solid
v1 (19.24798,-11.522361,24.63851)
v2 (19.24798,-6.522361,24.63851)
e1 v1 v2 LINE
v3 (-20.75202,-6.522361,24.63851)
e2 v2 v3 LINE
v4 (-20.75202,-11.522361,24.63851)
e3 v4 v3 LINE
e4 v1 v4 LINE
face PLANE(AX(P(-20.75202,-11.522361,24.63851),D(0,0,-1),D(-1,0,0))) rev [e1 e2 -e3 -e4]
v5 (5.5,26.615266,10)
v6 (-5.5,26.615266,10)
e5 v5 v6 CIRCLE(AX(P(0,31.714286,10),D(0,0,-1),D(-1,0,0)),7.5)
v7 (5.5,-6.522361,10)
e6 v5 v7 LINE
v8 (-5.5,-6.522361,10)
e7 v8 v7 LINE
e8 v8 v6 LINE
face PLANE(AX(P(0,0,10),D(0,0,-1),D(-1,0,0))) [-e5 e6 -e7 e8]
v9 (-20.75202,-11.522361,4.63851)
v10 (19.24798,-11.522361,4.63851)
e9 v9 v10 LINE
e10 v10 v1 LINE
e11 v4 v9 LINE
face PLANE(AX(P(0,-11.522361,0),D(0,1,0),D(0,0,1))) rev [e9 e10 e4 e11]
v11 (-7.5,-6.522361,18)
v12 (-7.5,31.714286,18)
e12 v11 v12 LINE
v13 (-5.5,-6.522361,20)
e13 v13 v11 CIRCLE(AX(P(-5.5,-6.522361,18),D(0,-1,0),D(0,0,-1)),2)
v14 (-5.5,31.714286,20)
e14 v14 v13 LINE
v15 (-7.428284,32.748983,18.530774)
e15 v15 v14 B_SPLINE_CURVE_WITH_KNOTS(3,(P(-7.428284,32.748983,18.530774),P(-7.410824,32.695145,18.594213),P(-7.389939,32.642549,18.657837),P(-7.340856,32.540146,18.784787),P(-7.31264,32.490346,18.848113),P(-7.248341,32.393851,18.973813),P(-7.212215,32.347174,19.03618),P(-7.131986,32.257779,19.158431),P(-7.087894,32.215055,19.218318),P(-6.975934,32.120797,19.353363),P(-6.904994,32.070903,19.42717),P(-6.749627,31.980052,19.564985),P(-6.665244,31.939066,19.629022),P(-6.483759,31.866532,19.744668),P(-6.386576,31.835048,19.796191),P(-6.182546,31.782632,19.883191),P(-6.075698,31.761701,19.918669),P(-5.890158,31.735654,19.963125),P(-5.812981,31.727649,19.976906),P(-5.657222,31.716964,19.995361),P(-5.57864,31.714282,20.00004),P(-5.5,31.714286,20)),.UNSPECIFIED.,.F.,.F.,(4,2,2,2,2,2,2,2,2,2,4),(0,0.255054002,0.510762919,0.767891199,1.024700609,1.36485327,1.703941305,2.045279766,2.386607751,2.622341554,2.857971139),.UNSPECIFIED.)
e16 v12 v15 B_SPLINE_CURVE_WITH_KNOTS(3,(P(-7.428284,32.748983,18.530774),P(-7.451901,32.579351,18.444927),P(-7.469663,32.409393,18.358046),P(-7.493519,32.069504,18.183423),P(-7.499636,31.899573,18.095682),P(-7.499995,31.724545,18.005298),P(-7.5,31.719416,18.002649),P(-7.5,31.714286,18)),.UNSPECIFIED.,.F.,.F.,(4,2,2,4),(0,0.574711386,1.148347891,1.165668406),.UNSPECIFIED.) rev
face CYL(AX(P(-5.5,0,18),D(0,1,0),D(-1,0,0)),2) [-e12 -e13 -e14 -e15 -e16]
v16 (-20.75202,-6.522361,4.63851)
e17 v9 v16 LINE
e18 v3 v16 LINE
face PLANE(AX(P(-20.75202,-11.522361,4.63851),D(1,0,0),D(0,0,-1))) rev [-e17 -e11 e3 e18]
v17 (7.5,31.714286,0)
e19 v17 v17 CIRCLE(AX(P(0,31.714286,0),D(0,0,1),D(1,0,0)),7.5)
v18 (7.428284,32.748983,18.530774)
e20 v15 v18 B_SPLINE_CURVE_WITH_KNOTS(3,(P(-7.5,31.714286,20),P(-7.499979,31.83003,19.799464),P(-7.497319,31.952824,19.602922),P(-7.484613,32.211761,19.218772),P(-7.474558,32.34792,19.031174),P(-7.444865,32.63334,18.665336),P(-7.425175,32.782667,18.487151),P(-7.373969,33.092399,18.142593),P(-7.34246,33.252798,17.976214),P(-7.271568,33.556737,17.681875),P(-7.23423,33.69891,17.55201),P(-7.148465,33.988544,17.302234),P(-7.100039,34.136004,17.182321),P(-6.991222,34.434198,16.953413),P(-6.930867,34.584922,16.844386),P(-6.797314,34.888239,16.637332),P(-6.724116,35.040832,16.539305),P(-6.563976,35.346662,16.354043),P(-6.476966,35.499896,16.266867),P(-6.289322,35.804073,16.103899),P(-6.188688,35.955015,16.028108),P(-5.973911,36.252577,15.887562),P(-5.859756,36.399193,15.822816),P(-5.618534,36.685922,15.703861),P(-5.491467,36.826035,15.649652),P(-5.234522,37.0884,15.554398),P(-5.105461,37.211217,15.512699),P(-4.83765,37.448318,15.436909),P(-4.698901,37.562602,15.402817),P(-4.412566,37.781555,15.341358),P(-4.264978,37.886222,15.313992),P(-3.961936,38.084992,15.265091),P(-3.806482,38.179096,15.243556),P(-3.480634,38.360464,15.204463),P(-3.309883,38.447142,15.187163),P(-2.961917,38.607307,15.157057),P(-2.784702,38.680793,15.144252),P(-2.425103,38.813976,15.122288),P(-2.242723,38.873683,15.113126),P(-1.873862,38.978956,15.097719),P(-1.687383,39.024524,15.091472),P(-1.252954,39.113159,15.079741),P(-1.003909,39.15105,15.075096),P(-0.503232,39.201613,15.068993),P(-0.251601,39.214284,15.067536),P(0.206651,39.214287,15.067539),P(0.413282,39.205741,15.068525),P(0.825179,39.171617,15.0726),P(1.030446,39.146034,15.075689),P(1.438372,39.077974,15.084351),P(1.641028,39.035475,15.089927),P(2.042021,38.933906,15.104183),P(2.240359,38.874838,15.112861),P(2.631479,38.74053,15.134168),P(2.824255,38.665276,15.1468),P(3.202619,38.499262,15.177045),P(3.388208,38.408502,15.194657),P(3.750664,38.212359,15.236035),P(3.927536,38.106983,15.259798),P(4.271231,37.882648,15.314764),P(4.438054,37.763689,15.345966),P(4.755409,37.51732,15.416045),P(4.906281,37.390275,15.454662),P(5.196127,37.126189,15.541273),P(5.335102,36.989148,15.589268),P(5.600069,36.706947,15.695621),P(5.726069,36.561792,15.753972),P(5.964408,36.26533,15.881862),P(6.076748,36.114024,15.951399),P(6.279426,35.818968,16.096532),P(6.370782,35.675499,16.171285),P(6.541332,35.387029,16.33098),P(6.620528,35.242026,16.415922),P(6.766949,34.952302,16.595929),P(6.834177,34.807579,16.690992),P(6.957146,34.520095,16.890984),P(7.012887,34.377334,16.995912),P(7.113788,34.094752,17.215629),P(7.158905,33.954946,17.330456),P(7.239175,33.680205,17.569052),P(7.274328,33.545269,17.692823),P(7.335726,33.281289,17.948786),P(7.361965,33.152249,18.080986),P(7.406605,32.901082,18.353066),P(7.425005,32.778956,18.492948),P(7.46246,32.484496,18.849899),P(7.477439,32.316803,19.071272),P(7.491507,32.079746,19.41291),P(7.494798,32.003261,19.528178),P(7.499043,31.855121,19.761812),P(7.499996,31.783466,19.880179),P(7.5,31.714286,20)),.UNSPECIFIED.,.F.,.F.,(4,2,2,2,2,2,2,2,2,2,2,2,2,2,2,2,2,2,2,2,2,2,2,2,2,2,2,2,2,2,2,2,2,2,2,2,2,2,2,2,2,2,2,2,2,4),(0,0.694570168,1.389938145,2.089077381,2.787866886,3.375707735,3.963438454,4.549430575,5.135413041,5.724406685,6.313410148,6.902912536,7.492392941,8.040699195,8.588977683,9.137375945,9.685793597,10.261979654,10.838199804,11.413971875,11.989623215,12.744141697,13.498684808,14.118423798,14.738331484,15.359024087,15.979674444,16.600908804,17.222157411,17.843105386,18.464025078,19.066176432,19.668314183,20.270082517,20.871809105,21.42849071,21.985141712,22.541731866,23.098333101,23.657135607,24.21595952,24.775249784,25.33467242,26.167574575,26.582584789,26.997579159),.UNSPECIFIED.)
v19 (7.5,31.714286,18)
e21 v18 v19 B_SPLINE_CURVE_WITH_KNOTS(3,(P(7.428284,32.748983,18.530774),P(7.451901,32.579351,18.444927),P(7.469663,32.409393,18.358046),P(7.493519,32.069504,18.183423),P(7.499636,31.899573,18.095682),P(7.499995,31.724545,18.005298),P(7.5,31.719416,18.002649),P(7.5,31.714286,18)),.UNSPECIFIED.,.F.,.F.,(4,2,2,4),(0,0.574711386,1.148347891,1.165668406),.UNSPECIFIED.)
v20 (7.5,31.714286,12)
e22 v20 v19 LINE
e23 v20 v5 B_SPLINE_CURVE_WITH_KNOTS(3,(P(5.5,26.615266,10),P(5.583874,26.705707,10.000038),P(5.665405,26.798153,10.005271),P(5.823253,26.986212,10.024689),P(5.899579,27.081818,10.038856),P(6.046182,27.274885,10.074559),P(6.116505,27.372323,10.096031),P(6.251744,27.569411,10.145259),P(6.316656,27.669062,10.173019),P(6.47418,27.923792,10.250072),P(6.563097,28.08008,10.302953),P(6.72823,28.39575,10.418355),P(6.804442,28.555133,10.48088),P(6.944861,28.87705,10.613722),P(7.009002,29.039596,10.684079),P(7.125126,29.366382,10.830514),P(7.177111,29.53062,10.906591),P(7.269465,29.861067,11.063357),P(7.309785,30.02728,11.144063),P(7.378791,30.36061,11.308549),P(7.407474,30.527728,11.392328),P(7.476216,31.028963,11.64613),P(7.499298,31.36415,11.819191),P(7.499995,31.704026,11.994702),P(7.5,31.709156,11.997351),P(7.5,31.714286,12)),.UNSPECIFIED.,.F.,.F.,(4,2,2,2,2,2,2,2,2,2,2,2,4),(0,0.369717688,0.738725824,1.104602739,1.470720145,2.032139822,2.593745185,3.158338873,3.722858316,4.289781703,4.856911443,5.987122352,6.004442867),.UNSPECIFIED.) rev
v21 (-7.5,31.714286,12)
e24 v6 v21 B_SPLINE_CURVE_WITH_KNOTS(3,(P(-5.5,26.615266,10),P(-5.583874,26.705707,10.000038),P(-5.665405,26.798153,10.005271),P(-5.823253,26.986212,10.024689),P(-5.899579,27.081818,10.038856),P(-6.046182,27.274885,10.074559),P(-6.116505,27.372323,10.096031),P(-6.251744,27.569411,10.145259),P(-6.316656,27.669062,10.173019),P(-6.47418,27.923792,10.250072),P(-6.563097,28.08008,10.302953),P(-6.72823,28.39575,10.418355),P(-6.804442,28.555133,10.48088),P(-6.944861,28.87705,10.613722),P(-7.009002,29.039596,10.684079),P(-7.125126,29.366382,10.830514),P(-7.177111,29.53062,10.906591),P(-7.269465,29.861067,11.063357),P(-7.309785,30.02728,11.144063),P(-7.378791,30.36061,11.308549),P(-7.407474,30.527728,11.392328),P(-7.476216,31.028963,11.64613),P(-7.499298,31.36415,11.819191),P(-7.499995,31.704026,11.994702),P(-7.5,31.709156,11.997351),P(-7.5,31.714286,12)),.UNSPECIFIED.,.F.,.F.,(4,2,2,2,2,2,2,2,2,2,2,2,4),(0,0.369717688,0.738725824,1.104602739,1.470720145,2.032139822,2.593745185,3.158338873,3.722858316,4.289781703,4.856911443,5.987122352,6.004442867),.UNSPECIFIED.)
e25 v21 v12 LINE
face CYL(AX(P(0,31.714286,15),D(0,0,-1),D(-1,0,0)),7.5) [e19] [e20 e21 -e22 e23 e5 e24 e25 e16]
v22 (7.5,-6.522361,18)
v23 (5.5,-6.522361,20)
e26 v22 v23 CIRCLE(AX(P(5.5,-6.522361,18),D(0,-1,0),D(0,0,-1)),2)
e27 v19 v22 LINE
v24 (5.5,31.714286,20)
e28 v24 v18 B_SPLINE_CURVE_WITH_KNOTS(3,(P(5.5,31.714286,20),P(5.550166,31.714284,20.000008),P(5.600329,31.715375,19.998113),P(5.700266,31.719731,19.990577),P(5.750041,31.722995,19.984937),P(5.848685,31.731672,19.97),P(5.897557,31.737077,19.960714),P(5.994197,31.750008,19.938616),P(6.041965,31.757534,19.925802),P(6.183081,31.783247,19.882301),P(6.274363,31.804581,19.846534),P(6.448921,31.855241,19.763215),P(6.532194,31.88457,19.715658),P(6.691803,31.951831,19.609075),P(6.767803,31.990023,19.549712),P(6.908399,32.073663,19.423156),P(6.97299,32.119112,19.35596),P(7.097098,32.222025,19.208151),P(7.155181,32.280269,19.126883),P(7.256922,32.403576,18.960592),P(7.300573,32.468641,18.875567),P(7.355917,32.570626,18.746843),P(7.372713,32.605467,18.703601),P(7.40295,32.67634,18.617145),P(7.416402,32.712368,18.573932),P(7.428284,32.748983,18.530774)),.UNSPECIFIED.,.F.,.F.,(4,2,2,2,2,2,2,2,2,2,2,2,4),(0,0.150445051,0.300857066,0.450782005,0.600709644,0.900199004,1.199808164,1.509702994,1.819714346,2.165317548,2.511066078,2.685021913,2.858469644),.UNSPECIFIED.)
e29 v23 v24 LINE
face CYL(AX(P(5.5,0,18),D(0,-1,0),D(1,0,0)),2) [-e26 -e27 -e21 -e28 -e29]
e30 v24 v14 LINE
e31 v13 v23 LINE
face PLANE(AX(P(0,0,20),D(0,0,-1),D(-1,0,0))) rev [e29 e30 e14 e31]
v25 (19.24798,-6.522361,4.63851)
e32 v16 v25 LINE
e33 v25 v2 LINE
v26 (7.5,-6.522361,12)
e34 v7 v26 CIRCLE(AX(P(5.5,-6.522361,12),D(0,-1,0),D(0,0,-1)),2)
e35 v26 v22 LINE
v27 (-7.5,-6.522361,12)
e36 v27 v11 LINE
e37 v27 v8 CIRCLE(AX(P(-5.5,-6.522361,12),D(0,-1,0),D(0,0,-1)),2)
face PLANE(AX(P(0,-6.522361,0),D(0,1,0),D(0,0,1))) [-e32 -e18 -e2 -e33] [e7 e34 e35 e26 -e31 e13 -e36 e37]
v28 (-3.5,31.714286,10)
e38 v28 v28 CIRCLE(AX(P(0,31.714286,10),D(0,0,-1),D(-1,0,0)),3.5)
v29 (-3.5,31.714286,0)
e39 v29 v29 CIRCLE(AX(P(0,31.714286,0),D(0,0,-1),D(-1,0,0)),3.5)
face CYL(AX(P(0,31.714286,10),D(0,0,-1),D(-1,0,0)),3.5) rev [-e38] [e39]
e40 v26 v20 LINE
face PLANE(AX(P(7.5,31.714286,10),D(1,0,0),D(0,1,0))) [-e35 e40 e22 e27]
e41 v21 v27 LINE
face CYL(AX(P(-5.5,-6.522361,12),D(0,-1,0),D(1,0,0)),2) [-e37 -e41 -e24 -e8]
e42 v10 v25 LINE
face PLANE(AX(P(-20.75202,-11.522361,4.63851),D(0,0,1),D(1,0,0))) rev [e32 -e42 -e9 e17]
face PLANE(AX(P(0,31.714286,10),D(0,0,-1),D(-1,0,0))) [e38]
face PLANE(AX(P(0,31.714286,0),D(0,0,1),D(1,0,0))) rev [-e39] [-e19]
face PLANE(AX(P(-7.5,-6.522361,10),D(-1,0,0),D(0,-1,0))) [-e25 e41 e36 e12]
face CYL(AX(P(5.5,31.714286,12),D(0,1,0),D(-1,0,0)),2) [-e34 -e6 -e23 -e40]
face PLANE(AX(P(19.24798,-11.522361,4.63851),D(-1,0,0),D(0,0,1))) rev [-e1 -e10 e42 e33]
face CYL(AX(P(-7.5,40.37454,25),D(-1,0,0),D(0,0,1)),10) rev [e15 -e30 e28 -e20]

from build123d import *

# Parameters (mm, degrees)
IZIM1_R                          = 7.5
Y_KSEKLIK_EKSTR_ZYON1_DEPTH      = 15
Y_KSEKLIK_EKSTR_ZYON2_DEPTH      = 5
Y_KSEKLIK_EKSTR_ZYON2_DEPTH_BACK = 5
IZIM2_W                          = 15
IZIM2_H                          = 38.236646402
RADYUS1_R                        = 10
RADYUS2_R                        = 2
IZIM3_R                          = 3.5
KES_EKSTR_ZYON1_DEPTH            = 10
IZIM4_W                          = 40
IZIM4_H                          = 20
Y_KSEKLIK_EKSTR_ZYON3_DEPTH      = 5


with BuildPart() as part:
    # Çizim1 → Yükseklik-Ekstrüzyon1 (new body)
    with BuildSketch(Plane.XY):
        with Locations((0, 31.714285714)):
            Circle(IZIM1_R)
    extrude(amount=Y_KSEKLIK_EKSTR_ZYON1_DEPTH)

    # Çizim2 → Yükseklik-Ekstrüzyon2 (add, two sides: drawn at the far end of the back side and taken through both)
    with BuildSketch(Plane.XY.offset(15).offset(-Y_KSEKLIK_EKSTR_ZYON2_DEPTH_BACK)):
        with Locations((0, 12.595962513)):
            Rectangle(IZIM2_W, IZIM2_H)
    extrude(amount=Y_KSEKLIK_EKSTR_ZYON2_DEPTH + Y_KSEKLIK_EKSTR_ZYON2_DEPTH_BACK)

    # Radyus1
    # the kernel refuses this fillet: 10 mm, written as the material it adds along each edge
    with BuildSketch(Plane(origin=(29.150635095, 31.714285714, 15), x_dir=(0, 1, 0), z_dir=(-1, 0, 0))) as radyus1_piece_1_section:
        with BuildLine():
            CenterArc((8.660254038, -10), RADYUS1_R, 90, 60)
            Line((0, -5), (0, 0))
            Line((0, 0), (8.660254038, 0))
        make_face()
    radyus1_piece_1 = extrude(amount=58.301270189, mode=Mode.PRIVATE)
    radyus1_piece_1 = radyus1_piece_1 & Plane(origin=(0, 31.714285714, 15), x_dir=(1, 0, 0), z_dir=(0, 0, -1)) * Cylinder(7.5, 152, mode=Mode.PRIVATE)
    add(radyus1_piece_1)

    # Radyus2
    # the kernel refuses this fillet: 2 mm, written as the material it takes off along each edge
    with BuildSketch(Plane(origin=(-7.5, -11.522360688, 10), x_dir=(0, 0, 1), z_dir=(0, 1, 0))) as radyus2_piece_1_section:
        with BuildLine():
            CenterArc((RADYUS2_R, RADYUS2_R), RADYUS2_R, 180, 90)
            Line((0, RADYUS2_R), (0, 0))
            Line((0, 0), (RADYUS2_R, 0))
        make_face()
    radyus2_piece_1 = extrude(amount=51.736646403, mode=Mode.PRIVATE)
    radyus2_piece_1 = radyus2_piece_1 - Plane(origin=(0, 31.714285714, 10), x_dir=(1, 0, 0), z_dir=(0, 0, -1)) * Cylinder(7.5, 112, mode=Mode.PRIVATE)
    add(radyus2_piece_1, mode=Mode.SUBTRACT)
    with BuildSketch(Plane(origin=(-7.5, -11.522360688, 20), x_dir=(0, 0, -1), z_dir=(0, 1, 0)), Plane(origin=(7.5, 40.214285714, 20), x_dir=(0, 0, -1), z_dir=(0, -1, 0))) as radyus2_piece_2:
        with BuildLine():
            CenterArc((RADYUS2_R, -RADYUS2_R), RADYUS2_R, 90, 90)
            Line((0, -RADYUS2_R), (0, 0))
            Line((0, 0), (RADYUS2_R, 0))
        make_face()
    extrude(amount=51.736646403, mode=Mode.SUBTRACT)
    with BuildSketch(Plane(origin=(7.5, 40.214285714, 10), x_dir=(-1, 0, 0), z_dir=(0, -1, 0))) as radyus2_piece_3_section:
        with BuildLine():
            CenterArc((RADYUS2_R, -RADYUS2_R), RADYUS2_R, 90, 90)
            Line((0, -RADYUS2_R), (0, 0))
            Line((0, 0), (RADYUS2_R, 0))
        make_face()
    radyus2_piece_3 = extrude(amount=51.736646403, mode=Mode.PRIVATE)
    radyus2_piece_3 = radyus2_piece_3 - Plane(origin=(0, 31.714285714, 10), x_dir=(1, 0, 0), z_dir=(0, 0, -1)) * Cylinder(7.5, 112, mode=Mode.PRIVATE)
    add(radyus2_piece_3, mode=Mode.SUBTRACT)

    # Çizim3 → Kes-Ekstrüzyon1 (cut)
    with BuildSketch(Plane(origin=(0, 0, 0), x_dir=(-1, 0, 0), z_dir=(0, 0, -1))):
        with Locations((0, 31.714285714)):
            Circle(IZIM3_R)
    extrude(amount=-KES_EKSTR_ZYON1_DEPTH, mode=Mode.SUBTRACT)

    # Çizim4 → Yükseklik-Ekstrüzyon3 (add)
    with BuildSketch(Plane(origin=(0, -6.522360688, 0), x_dir=(-1, 0, 0), z_dir=(0, -1, 0))):
        with Locations((0.752019729, -14.638510347)):
            Rectangle(IZIM4_W, IZIM4_H)
    extrude(amount=Y_KSEKLIK_EKSTR_ZYON3_DEPTH)


solid = part.part
